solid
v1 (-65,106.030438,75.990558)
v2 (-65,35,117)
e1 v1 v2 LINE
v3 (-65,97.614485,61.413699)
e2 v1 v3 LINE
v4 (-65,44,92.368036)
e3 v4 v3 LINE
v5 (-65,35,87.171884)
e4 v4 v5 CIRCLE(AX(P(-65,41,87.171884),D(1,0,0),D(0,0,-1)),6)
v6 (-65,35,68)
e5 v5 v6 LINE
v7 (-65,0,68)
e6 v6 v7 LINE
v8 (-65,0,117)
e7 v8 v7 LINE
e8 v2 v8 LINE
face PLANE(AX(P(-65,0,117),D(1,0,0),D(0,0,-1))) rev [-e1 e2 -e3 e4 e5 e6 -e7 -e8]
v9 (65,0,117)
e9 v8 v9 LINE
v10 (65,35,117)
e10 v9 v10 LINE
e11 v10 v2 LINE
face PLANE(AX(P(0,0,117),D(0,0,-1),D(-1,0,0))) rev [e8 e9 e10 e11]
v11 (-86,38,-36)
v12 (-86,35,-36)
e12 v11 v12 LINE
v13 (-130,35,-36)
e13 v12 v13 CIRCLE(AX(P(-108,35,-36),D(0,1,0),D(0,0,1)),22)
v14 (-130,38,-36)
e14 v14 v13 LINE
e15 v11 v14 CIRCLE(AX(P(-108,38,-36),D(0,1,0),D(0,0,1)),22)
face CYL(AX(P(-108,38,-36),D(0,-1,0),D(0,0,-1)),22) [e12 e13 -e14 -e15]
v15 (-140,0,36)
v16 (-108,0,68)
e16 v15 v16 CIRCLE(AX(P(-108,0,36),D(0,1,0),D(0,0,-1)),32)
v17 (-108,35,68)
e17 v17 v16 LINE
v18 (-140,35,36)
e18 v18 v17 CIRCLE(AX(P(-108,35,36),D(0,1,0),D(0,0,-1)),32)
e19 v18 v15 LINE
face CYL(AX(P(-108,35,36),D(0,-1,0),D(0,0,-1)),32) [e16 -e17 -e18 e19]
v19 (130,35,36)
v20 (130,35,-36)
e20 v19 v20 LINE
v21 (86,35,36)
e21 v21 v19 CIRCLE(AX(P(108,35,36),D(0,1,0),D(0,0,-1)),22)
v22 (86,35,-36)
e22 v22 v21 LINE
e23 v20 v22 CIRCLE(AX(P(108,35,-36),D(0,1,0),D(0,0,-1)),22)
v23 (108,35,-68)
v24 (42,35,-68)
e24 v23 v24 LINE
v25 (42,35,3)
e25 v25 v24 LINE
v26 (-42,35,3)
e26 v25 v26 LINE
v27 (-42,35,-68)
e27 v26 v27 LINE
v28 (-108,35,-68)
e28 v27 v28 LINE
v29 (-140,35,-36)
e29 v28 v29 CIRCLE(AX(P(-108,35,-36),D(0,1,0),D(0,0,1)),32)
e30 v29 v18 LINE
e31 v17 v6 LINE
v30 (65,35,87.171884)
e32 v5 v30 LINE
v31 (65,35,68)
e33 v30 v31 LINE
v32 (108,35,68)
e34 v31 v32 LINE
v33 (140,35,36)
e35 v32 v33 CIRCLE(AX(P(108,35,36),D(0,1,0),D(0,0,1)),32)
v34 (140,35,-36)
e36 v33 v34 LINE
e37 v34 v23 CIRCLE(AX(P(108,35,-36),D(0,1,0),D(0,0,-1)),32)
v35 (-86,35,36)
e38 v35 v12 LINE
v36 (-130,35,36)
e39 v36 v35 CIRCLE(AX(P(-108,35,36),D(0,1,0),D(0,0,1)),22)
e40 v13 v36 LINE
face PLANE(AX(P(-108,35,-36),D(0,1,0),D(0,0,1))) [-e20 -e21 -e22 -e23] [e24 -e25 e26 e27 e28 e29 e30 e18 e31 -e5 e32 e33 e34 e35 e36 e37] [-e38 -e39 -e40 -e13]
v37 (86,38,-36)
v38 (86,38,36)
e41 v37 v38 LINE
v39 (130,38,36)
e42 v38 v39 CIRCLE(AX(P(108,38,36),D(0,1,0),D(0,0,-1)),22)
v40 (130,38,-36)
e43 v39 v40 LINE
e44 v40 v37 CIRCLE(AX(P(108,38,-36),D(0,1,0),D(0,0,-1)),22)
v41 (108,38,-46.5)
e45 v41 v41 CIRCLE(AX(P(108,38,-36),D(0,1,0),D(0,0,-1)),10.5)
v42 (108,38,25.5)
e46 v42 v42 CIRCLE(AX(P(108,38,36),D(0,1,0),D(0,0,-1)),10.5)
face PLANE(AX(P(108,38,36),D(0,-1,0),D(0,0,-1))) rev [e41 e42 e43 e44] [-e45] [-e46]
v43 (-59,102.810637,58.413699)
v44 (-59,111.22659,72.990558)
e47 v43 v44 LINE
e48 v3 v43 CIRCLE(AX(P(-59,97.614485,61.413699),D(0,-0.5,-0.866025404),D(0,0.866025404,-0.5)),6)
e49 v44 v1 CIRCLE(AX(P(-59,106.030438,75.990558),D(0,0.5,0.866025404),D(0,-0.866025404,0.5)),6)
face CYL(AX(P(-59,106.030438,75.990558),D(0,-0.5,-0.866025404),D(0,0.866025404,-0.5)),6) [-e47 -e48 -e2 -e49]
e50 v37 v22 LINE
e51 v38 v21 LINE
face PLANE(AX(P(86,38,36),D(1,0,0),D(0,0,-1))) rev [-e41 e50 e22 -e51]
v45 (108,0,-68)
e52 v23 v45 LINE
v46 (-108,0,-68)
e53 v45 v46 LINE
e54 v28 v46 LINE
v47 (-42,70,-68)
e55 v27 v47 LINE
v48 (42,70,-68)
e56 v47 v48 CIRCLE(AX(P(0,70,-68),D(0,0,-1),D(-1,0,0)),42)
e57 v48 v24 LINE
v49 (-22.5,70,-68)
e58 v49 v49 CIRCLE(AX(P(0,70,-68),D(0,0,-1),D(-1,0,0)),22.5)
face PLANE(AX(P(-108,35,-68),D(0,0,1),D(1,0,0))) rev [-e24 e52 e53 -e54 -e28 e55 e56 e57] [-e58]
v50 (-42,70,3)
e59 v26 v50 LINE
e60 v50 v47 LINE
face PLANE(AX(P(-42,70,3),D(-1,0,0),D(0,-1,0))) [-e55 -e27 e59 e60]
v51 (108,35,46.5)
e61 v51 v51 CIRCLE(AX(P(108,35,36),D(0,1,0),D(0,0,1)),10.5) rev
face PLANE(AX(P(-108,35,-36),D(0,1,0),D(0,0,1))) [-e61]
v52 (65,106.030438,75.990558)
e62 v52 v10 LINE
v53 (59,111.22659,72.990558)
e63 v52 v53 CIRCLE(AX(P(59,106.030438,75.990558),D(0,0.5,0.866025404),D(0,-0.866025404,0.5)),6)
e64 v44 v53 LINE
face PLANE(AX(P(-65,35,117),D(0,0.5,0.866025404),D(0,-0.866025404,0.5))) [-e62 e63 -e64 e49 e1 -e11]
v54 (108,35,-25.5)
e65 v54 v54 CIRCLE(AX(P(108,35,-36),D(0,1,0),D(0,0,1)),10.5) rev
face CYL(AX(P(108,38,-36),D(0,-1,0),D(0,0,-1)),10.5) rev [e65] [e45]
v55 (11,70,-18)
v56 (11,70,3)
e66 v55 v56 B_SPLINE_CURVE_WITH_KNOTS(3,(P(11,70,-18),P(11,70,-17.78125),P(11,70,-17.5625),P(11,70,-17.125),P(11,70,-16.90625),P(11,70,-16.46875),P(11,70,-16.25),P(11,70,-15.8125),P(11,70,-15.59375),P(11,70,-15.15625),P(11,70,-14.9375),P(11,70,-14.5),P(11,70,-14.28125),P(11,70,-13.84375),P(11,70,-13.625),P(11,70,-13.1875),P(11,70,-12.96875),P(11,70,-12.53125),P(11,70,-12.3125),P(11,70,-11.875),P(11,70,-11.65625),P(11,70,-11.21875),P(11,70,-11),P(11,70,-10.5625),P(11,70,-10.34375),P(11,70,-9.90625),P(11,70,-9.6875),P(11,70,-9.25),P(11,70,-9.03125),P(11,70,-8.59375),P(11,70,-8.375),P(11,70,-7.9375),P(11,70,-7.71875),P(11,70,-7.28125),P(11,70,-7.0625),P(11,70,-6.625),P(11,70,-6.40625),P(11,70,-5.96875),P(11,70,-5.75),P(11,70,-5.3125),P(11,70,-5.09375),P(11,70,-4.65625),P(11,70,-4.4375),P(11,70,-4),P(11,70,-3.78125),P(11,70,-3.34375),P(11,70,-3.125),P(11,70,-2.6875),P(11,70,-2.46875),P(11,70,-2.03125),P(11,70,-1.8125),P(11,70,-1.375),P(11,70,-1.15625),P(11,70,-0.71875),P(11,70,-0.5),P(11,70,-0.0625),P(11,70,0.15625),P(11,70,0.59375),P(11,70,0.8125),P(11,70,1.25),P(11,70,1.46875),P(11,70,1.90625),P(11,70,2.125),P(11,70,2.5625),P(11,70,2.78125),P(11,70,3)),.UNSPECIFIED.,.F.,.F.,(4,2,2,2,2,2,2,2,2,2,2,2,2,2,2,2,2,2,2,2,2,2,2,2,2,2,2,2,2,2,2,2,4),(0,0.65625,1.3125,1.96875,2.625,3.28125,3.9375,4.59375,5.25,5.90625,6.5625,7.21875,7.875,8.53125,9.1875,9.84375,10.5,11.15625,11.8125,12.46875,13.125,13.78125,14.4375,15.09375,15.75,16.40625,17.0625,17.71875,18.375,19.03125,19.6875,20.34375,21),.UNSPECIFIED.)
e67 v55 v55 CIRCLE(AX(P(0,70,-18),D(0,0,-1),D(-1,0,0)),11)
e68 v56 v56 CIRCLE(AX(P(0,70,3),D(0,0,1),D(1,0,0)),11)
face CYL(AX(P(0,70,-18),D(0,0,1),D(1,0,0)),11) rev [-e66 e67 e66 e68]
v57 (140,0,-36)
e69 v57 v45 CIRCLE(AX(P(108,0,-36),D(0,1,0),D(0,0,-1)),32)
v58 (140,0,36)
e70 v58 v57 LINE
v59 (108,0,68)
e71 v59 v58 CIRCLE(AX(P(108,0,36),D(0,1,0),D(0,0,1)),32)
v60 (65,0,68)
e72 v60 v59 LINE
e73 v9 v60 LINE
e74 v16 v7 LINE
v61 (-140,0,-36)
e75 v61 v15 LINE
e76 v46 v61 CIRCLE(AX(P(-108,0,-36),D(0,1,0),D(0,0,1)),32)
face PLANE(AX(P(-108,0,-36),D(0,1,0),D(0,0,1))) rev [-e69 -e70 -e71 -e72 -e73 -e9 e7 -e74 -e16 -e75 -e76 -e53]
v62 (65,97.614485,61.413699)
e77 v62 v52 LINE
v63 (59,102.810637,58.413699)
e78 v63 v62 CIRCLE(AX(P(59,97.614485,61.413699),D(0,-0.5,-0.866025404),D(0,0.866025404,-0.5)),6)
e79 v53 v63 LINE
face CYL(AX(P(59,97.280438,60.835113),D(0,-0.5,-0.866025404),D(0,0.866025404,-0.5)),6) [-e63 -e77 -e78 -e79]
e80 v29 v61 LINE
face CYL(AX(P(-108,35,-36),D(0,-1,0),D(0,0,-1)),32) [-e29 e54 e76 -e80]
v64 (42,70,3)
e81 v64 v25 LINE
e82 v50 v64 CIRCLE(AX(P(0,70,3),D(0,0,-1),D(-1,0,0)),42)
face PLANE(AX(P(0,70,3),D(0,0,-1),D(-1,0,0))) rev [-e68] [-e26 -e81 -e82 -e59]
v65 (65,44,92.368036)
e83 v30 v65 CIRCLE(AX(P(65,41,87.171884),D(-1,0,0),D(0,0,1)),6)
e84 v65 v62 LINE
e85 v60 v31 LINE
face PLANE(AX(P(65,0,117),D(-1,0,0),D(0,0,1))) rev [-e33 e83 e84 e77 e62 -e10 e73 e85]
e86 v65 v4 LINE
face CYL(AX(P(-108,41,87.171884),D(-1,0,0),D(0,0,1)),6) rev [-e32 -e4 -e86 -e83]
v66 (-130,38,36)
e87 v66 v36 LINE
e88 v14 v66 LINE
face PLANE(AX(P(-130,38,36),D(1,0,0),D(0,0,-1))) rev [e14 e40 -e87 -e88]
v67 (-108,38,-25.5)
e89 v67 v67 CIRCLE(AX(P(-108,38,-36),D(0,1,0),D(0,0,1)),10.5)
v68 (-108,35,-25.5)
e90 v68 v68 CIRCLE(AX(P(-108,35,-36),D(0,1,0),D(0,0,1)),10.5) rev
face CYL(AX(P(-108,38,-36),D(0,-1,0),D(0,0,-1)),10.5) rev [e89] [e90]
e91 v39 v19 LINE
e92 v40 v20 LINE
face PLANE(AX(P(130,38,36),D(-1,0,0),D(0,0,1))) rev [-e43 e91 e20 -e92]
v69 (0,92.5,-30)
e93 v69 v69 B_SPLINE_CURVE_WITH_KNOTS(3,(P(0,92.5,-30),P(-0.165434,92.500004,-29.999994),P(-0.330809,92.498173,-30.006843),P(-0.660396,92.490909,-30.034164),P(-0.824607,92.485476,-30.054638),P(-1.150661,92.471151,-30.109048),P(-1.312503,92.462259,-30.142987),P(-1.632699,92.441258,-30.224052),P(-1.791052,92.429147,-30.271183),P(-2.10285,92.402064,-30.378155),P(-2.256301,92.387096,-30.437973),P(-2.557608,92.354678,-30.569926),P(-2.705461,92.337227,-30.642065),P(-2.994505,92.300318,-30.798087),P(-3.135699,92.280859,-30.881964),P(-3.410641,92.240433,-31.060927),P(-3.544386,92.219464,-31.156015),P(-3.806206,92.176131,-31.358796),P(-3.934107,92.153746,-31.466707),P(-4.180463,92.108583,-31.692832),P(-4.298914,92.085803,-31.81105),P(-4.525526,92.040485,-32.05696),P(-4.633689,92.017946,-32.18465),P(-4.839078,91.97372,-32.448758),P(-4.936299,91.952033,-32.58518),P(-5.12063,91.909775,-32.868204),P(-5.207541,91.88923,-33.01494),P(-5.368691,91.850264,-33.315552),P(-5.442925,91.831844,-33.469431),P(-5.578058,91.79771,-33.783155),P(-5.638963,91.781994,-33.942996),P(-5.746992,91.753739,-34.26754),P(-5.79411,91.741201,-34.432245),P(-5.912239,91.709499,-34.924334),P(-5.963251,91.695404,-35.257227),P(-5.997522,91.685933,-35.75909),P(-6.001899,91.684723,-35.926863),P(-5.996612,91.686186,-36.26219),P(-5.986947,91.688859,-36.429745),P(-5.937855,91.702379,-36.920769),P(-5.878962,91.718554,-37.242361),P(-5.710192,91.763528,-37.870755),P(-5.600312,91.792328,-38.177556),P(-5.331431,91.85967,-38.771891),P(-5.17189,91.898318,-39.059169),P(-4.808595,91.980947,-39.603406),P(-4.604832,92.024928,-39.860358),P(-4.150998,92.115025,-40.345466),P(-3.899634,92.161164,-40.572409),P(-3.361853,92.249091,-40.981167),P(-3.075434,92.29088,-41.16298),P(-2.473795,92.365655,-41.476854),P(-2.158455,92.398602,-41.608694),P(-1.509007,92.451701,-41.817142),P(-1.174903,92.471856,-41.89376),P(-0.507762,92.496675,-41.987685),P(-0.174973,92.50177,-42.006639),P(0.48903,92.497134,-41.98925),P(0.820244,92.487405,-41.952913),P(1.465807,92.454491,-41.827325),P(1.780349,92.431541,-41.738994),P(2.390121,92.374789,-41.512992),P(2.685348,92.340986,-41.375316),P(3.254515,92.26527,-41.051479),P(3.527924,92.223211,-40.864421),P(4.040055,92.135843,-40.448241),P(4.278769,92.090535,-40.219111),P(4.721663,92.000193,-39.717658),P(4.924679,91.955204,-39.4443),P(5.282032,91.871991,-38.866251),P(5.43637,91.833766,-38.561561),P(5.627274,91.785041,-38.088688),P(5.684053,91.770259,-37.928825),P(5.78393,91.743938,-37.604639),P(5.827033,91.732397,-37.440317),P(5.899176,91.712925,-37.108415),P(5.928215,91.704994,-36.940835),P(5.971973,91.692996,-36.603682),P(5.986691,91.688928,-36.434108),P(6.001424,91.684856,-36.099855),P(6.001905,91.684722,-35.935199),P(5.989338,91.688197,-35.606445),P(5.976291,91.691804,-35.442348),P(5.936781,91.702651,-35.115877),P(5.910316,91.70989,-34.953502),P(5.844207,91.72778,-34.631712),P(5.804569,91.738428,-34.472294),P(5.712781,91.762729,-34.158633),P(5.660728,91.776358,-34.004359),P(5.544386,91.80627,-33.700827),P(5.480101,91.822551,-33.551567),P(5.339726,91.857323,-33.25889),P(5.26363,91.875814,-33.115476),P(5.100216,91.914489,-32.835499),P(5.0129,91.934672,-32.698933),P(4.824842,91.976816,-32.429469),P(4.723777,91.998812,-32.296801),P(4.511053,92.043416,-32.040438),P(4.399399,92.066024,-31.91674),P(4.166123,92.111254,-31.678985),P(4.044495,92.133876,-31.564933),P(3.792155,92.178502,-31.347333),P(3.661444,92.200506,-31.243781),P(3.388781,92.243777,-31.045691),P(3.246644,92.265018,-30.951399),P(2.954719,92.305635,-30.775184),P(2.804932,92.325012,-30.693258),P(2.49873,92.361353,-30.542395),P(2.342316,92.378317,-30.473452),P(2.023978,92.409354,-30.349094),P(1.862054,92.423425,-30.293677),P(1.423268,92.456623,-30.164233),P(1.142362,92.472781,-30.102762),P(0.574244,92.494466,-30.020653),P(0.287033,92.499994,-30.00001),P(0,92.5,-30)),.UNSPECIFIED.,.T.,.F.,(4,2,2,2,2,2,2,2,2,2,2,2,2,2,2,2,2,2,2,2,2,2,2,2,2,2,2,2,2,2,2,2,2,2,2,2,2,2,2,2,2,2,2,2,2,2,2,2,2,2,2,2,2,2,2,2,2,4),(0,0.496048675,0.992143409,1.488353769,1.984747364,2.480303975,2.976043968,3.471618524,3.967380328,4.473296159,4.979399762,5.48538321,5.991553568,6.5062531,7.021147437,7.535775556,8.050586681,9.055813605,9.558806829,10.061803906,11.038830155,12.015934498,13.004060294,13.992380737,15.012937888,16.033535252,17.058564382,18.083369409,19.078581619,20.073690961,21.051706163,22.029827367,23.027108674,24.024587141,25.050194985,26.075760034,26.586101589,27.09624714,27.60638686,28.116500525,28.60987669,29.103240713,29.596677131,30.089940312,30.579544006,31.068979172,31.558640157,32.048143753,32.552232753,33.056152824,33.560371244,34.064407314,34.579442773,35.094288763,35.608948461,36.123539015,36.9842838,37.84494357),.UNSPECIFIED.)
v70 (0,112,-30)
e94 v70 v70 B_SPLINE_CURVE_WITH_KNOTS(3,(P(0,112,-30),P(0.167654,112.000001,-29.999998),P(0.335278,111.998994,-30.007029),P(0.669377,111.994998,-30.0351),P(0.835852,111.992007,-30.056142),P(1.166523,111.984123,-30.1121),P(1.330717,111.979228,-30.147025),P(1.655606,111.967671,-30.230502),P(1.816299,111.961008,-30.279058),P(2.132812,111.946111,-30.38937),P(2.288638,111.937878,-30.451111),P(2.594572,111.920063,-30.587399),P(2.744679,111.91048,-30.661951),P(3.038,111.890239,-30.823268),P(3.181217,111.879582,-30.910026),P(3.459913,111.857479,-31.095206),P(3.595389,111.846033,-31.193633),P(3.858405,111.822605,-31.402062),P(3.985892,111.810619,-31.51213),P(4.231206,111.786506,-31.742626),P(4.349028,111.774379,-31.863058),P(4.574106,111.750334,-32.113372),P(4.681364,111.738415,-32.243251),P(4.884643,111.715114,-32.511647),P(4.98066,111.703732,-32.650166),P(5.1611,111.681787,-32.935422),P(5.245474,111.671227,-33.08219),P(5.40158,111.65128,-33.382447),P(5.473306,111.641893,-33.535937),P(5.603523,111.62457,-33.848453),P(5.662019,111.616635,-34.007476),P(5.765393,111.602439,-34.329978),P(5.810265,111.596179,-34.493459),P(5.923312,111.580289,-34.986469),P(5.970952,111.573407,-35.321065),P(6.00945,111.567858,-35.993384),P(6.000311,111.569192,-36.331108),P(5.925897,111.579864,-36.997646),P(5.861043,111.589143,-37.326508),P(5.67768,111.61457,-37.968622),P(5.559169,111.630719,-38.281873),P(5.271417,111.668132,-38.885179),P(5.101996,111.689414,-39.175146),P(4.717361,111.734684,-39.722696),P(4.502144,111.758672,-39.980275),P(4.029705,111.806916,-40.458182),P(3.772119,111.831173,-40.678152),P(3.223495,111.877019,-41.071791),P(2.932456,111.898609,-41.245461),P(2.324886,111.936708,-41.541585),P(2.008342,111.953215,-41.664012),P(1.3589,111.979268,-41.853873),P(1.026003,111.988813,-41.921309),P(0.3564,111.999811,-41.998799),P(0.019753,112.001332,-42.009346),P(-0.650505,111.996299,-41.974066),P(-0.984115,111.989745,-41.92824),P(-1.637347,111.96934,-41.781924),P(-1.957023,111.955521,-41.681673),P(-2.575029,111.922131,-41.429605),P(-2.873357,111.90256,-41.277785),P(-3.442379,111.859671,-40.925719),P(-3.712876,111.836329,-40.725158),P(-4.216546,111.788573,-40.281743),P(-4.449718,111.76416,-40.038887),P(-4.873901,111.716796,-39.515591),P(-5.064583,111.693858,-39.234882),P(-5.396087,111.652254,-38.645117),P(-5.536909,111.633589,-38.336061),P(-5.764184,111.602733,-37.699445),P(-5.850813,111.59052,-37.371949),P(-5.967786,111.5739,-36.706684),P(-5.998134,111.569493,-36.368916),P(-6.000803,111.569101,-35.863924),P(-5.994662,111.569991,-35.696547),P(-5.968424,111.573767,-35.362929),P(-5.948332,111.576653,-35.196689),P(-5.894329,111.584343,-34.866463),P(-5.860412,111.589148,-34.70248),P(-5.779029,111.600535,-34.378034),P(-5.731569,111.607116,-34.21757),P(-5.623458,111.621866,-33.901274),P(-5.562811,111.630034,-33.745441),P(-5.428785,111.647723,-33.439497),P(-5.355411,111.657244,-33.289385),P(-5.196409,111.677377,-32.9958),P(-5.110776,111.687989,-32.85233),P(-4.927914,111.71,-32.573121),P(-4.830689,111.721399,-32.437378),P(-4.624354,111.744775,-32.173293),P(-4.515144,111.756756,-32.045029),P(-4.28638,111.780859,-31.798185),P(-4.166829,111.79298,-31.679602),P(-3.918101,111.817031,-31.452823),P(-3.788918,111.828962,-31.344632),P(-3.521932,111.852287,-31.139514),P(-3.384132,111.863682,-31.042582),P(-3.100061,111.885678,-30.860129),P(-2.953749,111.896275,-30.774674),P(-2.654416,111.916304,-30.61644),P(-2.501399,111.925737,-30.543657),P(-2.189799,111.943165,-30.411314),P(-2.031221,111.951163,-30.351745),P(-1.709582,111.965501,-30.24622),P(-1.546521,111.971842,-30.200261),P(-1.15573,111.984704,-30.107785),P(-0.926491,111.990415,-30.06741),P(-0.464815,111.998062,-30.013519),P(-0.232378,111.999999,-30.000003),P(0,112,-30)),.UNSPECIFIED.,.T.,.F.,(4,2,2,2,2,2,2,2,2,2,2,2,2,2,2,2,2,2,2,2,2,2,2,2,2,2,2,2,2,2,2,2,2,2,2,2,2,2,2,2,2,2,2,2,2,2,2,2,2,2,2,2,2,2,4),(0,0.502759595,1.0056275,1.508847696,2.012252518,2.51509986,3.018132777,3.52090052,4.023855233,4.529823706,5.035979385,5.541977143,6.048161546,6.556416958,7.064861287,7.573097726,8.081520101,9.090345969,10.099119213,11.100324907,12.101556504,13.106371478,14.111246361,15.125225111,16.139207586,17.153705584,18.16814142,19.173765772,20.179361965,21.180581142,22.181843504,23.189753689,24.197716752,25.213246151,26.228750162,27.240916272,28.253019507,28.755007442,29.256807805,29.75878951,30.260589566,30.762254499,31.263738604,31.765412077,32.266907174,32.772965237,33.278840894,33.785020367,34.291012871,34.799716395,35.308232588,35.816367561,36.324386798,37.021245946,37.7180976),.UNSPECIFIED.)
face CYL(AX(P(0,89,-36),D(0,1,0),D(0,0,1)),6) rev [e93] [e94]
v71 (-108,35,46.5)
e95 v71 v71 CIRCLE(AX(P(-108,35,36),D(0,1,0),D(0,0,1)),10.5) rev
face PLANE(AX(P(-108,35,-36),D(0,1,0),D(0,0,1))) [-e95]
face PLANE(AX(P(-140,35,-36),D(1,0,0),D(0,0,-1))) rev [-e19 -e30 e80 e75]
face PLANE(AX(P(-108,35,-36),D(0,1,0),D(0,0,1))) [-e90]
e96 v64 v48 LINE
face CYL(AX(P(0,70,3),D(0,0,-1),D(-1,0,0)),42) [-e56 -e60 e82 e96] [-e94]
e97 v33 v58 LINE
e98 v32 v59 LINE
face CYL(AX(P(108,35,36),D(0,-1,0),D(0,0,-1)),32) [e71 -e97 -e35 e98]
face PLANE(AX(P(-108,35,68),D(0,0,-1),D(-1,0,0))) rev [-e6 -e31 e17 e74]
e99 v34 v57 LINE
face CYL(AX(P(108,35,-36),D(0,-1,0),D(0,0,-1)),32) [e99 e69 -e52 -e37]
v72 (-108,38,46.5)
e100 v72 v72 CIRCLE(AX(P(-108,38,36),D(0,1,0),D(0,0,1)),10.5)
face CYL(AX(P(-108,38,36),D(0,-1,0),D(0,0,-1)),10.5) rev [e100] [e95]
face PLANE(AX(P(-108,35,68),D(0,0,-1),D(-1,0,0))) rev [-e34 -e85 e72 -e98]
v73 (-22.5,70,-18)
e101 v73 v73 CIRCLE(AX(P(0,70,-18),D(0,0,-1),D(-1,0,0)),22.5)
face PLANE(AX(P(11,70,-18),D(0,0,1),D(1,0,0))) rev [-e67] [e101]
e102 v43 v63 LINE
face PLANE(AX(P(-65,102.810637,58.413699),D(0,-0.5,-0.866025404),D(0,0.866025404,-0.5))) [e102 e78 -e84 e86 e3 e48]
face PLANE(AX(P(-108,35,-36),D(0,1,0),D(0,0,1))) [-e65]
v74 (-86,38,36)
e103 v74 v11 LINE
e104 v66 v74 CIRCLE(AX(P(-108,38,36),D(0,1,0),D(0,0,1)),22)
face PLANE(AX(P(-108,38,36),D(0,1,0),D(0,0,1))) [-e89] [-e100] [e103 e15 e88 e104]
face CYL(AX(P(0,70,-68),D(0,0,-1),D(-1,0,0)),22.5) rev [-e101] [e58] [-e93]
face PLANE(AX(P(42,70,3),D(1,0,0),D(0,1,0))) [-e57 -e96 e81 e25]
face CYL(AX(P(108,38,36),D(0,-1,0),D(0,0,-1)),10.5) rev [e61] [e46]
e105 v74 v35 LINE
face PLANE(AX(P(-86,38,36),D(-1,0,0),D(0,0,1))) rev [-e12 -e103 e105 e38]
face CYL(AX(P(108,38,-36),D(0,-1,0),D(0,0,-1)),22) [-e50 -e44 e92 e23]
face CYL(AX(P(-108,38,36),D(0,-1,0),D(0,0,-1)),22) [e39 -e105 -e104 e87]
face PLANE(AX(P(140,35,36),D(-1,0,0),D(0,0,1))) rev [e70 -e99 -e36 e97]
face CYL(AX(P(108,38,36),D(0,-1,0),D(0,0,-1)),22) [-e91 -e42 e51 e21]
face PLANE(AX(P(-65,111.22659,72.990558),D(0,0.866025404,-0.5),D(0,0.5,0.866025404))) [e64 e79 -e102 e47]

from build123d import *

# Parameters (mm, degrees)
Y_KSEKLIK_EKSTR_ZYON1_DEPTH              = 35
IZIM3_R                                  = 10.5
Y_KSEKLIK_EKSTR_ZYON2_DEPTH              = 3
Y_KSEKLIK_EKSTR_ZYON3_DEPTH              = 71
IZIM5_R                                  = 11
KES_EKSTR_ZYON1_DEPTH                    = 21
IZIM6_R                                  = 6
KES_EKSTR_ZYON2_DEPTH                    = 23
M10_START                                = -68
M10_ALT_GEN_BA_L_C_VATA_IN_HAV_A1_OUTL_R = 22.5
M10_ALT_GEN_BA_L_C_VATA_IN_HAV_A1_DEPTH  = 50
IZIM9_W                                  = 130
IZIM9_H                                  = 35
Y_KSEKLIK_EKSTR_ZYON4_DEPTH              = 49
Y_KSEKLIK_EKSTR_ZYON5_DEPTH              = 130
RADYUS1_R                                = 6
RADYUS2_R                                = 6


# Read off the part's stored shape, not the designer's step: M10 Altıgen Başlı Cıvata İçin Havşa1
with BuildPart() as part:
    # Çizim1 → Yükseklik-Ekstrüzyon1 (new body)
    with BuildSketch(Plane(origin=(0, 0, 0), x_dir=(1, 0, 0), z_dir=(0, 1, 0))):
        with BuildLine():
            Line((-108, 68), (108, 68))
            ThreePointArc((108, 68), (130.627416998, 58.627416998), (140, 36))
            Line((140, 36), (140, -36))
            ThreePointArc((140, -36), (130.627416998, -58.627416998), (108, -68))
            Line((108, -68), (-108, -68))
            ThreePointArc((-108, -68), (-130.627416998, -58.627416998), (-140, -36))
            Line((-140, -36), (-140, 36))
            ThreePointArc((-140, 36), (-130.627416998, 58.627416998), (-108, 68))
        make_face()
    extrude(amount=Y_KSEKLIK_EKSTR_ZYON1_DEPTH)

    # Çizim3 → Yükseklik-Ekstrüzyon2 (add)
    # profile 1 of 2: a face of its own
    with BuildSketch(Plane(origin=(0, 35, 0), x_dir=(1, 0, 0), z_dir=(0, 1, 0))):
        with BuildLine():
            Line((-130, -36), (-130, 36))
            ThreePointArc((-130, 36), (-108, 58), (-86, 36))
            Line((-86, 36), (-86, -36))
            ThreePointArc((-86, -36), (-108, -58), (-130, -36))
        make_face()
        with Locations(Location((-108, 36, 0), (0, 0, 270))):
            Circle(IZIM3_R, mode=Mode.SUBTRACT)
        with Locations(Location((-108, -36, 0), (0, 0, 270))):
            Circle(IZIM3_R, mode=Mode.SUBTRACT)
    # profile 2 of 2: a face of its own
    with BuildSketch(Plane(origin=(0, 35, 0), x_dir=(1, 0, 0), z_dir=(0, 1, 0))):
        with BuildLine():
            Line((130, -36), (130, 36))
            ThreePointArc((130, 36), (108, 58), (86, 36))
            Line((86, 36), (86, -36))
            ThreePointArc((86, -36), (108, -58), (130, -36))
        make_face()
        with Locations(Location((108, -36, 0), (0, 0, 90))):
            Circle(IZIM3_R, mode=Mode.SUBTRACT)
        with Locations(Location((108, 36, 0), (0, 0, 90))):
            Circle(IZIM3_R, mode=Mode.SUBTRACT)
    extrude(amount=Y_KSEKLIK_EKSTR_ZYON2_DEPTH)

    # Çizim4 → Yükseklik-Ekstrüzyon3 (add)
    with BuildSketch(Plane(origin=(0, 0, -68), x_dir=(-1, 0, 0), z_dir=(0, 0, -1))):
        with BuildLine():
            Line((-42, 70), (-42, 35))
            Line((-42, 35), (42, 35))
            Line((42, 35), (42, 70))
            ThreePointArc((42, 70), (0, 112), (-42, 70))
        make_face()
    extrude(amount=-Y_KSEKLIK_EKSTR_ZYON3_DEPTH)

    # Çizim5 → Kes-Ekstrüzyon1 (cut)
    with BuildSketch(Plane.XY.offset(3)):
        with Locations((0, 70)):
            Circle(IZIM5_R)
    extrude(amount=-KES_EKSTR_ZYON1_DEPTH, mode=Mode.SUBTRACT)

    # Çizim6 → Kes-Ekstrüzyon2 (cut)
    with BuildSketch(Plane(origin=(0, 112, 0), x_dir=(1, 0, 0), z_dir=(0, 1, 0))):
        with Locations(Location((0, 36, 0), (0, 0, 270))):
            Circle(IZIM6_R)
    extrude(amount=-KES_EKSTR_ZYON2_DEPTH, mode=Mode.SUBTRACT)

    # M10 Altıgen Başlı Cıvata İçin Havşa1 outl → M10 Altıgen Başlı Cıvata İçin Havşa1 (cut)
    with BuildSketch(Plane.XY.offset(M10_START)):
        with Locations((0, 70)):
            Circle(M10_ALT_GEN_BA_L_C_VATA_IN_HAV_A1_OUTL_R)
    extrude(amount=M10_ALT_GEN_BA_L_C_VATA_IN_HAV_A1_DEPTH, mode=Mode.SUBTRACT)

    # Çizim9 → Yükseklik-Ekstrüzyon4 (add)
    with BuildSketch(Plane.XY.offset(68)):
        with Locations((0, 17.5)):
            Rectangle(IZIM9_W, IZIM9_H)
    extrude(amount=Y_KSEKLIK_EKSTR_ZYON4_DEPTH)

    # Çizim10 → Yükseklik-Ekstrüzyon5 (add)
    with BuildSketch(Plane(origin=(65, 0, 0), x_dir=(0, 0, -1), z_dir=(1, 0, 0))):
        Polygon((-117, 35), (-72.990557656, 111.226590152), (-58.413699339, 102.810637079), (-97.564188911, 35), align=None)
    extrude(amount=-Y_KSEKLIK_EKSTR_ZYON5_DEPTH)

    # Radyus1
    radyus1_edges = [part.edges().sort_by_distance(p)[0] for p in [
        (-65, 107.018613616, 65.702128498),
        (65, 107.018613616, 65.702128498),
    ]]
    fillet(radyus1_edges, radius=RADYUS1_R)

    # Radyus2
    radyus2_edges = [part.edges().sort_by_distance(p)[0] for p in [
        (0, 35, 97.564188911),
    ]]
    fillet(radyus2_edges, radius=RADYUS2_R)


solid = part.part
